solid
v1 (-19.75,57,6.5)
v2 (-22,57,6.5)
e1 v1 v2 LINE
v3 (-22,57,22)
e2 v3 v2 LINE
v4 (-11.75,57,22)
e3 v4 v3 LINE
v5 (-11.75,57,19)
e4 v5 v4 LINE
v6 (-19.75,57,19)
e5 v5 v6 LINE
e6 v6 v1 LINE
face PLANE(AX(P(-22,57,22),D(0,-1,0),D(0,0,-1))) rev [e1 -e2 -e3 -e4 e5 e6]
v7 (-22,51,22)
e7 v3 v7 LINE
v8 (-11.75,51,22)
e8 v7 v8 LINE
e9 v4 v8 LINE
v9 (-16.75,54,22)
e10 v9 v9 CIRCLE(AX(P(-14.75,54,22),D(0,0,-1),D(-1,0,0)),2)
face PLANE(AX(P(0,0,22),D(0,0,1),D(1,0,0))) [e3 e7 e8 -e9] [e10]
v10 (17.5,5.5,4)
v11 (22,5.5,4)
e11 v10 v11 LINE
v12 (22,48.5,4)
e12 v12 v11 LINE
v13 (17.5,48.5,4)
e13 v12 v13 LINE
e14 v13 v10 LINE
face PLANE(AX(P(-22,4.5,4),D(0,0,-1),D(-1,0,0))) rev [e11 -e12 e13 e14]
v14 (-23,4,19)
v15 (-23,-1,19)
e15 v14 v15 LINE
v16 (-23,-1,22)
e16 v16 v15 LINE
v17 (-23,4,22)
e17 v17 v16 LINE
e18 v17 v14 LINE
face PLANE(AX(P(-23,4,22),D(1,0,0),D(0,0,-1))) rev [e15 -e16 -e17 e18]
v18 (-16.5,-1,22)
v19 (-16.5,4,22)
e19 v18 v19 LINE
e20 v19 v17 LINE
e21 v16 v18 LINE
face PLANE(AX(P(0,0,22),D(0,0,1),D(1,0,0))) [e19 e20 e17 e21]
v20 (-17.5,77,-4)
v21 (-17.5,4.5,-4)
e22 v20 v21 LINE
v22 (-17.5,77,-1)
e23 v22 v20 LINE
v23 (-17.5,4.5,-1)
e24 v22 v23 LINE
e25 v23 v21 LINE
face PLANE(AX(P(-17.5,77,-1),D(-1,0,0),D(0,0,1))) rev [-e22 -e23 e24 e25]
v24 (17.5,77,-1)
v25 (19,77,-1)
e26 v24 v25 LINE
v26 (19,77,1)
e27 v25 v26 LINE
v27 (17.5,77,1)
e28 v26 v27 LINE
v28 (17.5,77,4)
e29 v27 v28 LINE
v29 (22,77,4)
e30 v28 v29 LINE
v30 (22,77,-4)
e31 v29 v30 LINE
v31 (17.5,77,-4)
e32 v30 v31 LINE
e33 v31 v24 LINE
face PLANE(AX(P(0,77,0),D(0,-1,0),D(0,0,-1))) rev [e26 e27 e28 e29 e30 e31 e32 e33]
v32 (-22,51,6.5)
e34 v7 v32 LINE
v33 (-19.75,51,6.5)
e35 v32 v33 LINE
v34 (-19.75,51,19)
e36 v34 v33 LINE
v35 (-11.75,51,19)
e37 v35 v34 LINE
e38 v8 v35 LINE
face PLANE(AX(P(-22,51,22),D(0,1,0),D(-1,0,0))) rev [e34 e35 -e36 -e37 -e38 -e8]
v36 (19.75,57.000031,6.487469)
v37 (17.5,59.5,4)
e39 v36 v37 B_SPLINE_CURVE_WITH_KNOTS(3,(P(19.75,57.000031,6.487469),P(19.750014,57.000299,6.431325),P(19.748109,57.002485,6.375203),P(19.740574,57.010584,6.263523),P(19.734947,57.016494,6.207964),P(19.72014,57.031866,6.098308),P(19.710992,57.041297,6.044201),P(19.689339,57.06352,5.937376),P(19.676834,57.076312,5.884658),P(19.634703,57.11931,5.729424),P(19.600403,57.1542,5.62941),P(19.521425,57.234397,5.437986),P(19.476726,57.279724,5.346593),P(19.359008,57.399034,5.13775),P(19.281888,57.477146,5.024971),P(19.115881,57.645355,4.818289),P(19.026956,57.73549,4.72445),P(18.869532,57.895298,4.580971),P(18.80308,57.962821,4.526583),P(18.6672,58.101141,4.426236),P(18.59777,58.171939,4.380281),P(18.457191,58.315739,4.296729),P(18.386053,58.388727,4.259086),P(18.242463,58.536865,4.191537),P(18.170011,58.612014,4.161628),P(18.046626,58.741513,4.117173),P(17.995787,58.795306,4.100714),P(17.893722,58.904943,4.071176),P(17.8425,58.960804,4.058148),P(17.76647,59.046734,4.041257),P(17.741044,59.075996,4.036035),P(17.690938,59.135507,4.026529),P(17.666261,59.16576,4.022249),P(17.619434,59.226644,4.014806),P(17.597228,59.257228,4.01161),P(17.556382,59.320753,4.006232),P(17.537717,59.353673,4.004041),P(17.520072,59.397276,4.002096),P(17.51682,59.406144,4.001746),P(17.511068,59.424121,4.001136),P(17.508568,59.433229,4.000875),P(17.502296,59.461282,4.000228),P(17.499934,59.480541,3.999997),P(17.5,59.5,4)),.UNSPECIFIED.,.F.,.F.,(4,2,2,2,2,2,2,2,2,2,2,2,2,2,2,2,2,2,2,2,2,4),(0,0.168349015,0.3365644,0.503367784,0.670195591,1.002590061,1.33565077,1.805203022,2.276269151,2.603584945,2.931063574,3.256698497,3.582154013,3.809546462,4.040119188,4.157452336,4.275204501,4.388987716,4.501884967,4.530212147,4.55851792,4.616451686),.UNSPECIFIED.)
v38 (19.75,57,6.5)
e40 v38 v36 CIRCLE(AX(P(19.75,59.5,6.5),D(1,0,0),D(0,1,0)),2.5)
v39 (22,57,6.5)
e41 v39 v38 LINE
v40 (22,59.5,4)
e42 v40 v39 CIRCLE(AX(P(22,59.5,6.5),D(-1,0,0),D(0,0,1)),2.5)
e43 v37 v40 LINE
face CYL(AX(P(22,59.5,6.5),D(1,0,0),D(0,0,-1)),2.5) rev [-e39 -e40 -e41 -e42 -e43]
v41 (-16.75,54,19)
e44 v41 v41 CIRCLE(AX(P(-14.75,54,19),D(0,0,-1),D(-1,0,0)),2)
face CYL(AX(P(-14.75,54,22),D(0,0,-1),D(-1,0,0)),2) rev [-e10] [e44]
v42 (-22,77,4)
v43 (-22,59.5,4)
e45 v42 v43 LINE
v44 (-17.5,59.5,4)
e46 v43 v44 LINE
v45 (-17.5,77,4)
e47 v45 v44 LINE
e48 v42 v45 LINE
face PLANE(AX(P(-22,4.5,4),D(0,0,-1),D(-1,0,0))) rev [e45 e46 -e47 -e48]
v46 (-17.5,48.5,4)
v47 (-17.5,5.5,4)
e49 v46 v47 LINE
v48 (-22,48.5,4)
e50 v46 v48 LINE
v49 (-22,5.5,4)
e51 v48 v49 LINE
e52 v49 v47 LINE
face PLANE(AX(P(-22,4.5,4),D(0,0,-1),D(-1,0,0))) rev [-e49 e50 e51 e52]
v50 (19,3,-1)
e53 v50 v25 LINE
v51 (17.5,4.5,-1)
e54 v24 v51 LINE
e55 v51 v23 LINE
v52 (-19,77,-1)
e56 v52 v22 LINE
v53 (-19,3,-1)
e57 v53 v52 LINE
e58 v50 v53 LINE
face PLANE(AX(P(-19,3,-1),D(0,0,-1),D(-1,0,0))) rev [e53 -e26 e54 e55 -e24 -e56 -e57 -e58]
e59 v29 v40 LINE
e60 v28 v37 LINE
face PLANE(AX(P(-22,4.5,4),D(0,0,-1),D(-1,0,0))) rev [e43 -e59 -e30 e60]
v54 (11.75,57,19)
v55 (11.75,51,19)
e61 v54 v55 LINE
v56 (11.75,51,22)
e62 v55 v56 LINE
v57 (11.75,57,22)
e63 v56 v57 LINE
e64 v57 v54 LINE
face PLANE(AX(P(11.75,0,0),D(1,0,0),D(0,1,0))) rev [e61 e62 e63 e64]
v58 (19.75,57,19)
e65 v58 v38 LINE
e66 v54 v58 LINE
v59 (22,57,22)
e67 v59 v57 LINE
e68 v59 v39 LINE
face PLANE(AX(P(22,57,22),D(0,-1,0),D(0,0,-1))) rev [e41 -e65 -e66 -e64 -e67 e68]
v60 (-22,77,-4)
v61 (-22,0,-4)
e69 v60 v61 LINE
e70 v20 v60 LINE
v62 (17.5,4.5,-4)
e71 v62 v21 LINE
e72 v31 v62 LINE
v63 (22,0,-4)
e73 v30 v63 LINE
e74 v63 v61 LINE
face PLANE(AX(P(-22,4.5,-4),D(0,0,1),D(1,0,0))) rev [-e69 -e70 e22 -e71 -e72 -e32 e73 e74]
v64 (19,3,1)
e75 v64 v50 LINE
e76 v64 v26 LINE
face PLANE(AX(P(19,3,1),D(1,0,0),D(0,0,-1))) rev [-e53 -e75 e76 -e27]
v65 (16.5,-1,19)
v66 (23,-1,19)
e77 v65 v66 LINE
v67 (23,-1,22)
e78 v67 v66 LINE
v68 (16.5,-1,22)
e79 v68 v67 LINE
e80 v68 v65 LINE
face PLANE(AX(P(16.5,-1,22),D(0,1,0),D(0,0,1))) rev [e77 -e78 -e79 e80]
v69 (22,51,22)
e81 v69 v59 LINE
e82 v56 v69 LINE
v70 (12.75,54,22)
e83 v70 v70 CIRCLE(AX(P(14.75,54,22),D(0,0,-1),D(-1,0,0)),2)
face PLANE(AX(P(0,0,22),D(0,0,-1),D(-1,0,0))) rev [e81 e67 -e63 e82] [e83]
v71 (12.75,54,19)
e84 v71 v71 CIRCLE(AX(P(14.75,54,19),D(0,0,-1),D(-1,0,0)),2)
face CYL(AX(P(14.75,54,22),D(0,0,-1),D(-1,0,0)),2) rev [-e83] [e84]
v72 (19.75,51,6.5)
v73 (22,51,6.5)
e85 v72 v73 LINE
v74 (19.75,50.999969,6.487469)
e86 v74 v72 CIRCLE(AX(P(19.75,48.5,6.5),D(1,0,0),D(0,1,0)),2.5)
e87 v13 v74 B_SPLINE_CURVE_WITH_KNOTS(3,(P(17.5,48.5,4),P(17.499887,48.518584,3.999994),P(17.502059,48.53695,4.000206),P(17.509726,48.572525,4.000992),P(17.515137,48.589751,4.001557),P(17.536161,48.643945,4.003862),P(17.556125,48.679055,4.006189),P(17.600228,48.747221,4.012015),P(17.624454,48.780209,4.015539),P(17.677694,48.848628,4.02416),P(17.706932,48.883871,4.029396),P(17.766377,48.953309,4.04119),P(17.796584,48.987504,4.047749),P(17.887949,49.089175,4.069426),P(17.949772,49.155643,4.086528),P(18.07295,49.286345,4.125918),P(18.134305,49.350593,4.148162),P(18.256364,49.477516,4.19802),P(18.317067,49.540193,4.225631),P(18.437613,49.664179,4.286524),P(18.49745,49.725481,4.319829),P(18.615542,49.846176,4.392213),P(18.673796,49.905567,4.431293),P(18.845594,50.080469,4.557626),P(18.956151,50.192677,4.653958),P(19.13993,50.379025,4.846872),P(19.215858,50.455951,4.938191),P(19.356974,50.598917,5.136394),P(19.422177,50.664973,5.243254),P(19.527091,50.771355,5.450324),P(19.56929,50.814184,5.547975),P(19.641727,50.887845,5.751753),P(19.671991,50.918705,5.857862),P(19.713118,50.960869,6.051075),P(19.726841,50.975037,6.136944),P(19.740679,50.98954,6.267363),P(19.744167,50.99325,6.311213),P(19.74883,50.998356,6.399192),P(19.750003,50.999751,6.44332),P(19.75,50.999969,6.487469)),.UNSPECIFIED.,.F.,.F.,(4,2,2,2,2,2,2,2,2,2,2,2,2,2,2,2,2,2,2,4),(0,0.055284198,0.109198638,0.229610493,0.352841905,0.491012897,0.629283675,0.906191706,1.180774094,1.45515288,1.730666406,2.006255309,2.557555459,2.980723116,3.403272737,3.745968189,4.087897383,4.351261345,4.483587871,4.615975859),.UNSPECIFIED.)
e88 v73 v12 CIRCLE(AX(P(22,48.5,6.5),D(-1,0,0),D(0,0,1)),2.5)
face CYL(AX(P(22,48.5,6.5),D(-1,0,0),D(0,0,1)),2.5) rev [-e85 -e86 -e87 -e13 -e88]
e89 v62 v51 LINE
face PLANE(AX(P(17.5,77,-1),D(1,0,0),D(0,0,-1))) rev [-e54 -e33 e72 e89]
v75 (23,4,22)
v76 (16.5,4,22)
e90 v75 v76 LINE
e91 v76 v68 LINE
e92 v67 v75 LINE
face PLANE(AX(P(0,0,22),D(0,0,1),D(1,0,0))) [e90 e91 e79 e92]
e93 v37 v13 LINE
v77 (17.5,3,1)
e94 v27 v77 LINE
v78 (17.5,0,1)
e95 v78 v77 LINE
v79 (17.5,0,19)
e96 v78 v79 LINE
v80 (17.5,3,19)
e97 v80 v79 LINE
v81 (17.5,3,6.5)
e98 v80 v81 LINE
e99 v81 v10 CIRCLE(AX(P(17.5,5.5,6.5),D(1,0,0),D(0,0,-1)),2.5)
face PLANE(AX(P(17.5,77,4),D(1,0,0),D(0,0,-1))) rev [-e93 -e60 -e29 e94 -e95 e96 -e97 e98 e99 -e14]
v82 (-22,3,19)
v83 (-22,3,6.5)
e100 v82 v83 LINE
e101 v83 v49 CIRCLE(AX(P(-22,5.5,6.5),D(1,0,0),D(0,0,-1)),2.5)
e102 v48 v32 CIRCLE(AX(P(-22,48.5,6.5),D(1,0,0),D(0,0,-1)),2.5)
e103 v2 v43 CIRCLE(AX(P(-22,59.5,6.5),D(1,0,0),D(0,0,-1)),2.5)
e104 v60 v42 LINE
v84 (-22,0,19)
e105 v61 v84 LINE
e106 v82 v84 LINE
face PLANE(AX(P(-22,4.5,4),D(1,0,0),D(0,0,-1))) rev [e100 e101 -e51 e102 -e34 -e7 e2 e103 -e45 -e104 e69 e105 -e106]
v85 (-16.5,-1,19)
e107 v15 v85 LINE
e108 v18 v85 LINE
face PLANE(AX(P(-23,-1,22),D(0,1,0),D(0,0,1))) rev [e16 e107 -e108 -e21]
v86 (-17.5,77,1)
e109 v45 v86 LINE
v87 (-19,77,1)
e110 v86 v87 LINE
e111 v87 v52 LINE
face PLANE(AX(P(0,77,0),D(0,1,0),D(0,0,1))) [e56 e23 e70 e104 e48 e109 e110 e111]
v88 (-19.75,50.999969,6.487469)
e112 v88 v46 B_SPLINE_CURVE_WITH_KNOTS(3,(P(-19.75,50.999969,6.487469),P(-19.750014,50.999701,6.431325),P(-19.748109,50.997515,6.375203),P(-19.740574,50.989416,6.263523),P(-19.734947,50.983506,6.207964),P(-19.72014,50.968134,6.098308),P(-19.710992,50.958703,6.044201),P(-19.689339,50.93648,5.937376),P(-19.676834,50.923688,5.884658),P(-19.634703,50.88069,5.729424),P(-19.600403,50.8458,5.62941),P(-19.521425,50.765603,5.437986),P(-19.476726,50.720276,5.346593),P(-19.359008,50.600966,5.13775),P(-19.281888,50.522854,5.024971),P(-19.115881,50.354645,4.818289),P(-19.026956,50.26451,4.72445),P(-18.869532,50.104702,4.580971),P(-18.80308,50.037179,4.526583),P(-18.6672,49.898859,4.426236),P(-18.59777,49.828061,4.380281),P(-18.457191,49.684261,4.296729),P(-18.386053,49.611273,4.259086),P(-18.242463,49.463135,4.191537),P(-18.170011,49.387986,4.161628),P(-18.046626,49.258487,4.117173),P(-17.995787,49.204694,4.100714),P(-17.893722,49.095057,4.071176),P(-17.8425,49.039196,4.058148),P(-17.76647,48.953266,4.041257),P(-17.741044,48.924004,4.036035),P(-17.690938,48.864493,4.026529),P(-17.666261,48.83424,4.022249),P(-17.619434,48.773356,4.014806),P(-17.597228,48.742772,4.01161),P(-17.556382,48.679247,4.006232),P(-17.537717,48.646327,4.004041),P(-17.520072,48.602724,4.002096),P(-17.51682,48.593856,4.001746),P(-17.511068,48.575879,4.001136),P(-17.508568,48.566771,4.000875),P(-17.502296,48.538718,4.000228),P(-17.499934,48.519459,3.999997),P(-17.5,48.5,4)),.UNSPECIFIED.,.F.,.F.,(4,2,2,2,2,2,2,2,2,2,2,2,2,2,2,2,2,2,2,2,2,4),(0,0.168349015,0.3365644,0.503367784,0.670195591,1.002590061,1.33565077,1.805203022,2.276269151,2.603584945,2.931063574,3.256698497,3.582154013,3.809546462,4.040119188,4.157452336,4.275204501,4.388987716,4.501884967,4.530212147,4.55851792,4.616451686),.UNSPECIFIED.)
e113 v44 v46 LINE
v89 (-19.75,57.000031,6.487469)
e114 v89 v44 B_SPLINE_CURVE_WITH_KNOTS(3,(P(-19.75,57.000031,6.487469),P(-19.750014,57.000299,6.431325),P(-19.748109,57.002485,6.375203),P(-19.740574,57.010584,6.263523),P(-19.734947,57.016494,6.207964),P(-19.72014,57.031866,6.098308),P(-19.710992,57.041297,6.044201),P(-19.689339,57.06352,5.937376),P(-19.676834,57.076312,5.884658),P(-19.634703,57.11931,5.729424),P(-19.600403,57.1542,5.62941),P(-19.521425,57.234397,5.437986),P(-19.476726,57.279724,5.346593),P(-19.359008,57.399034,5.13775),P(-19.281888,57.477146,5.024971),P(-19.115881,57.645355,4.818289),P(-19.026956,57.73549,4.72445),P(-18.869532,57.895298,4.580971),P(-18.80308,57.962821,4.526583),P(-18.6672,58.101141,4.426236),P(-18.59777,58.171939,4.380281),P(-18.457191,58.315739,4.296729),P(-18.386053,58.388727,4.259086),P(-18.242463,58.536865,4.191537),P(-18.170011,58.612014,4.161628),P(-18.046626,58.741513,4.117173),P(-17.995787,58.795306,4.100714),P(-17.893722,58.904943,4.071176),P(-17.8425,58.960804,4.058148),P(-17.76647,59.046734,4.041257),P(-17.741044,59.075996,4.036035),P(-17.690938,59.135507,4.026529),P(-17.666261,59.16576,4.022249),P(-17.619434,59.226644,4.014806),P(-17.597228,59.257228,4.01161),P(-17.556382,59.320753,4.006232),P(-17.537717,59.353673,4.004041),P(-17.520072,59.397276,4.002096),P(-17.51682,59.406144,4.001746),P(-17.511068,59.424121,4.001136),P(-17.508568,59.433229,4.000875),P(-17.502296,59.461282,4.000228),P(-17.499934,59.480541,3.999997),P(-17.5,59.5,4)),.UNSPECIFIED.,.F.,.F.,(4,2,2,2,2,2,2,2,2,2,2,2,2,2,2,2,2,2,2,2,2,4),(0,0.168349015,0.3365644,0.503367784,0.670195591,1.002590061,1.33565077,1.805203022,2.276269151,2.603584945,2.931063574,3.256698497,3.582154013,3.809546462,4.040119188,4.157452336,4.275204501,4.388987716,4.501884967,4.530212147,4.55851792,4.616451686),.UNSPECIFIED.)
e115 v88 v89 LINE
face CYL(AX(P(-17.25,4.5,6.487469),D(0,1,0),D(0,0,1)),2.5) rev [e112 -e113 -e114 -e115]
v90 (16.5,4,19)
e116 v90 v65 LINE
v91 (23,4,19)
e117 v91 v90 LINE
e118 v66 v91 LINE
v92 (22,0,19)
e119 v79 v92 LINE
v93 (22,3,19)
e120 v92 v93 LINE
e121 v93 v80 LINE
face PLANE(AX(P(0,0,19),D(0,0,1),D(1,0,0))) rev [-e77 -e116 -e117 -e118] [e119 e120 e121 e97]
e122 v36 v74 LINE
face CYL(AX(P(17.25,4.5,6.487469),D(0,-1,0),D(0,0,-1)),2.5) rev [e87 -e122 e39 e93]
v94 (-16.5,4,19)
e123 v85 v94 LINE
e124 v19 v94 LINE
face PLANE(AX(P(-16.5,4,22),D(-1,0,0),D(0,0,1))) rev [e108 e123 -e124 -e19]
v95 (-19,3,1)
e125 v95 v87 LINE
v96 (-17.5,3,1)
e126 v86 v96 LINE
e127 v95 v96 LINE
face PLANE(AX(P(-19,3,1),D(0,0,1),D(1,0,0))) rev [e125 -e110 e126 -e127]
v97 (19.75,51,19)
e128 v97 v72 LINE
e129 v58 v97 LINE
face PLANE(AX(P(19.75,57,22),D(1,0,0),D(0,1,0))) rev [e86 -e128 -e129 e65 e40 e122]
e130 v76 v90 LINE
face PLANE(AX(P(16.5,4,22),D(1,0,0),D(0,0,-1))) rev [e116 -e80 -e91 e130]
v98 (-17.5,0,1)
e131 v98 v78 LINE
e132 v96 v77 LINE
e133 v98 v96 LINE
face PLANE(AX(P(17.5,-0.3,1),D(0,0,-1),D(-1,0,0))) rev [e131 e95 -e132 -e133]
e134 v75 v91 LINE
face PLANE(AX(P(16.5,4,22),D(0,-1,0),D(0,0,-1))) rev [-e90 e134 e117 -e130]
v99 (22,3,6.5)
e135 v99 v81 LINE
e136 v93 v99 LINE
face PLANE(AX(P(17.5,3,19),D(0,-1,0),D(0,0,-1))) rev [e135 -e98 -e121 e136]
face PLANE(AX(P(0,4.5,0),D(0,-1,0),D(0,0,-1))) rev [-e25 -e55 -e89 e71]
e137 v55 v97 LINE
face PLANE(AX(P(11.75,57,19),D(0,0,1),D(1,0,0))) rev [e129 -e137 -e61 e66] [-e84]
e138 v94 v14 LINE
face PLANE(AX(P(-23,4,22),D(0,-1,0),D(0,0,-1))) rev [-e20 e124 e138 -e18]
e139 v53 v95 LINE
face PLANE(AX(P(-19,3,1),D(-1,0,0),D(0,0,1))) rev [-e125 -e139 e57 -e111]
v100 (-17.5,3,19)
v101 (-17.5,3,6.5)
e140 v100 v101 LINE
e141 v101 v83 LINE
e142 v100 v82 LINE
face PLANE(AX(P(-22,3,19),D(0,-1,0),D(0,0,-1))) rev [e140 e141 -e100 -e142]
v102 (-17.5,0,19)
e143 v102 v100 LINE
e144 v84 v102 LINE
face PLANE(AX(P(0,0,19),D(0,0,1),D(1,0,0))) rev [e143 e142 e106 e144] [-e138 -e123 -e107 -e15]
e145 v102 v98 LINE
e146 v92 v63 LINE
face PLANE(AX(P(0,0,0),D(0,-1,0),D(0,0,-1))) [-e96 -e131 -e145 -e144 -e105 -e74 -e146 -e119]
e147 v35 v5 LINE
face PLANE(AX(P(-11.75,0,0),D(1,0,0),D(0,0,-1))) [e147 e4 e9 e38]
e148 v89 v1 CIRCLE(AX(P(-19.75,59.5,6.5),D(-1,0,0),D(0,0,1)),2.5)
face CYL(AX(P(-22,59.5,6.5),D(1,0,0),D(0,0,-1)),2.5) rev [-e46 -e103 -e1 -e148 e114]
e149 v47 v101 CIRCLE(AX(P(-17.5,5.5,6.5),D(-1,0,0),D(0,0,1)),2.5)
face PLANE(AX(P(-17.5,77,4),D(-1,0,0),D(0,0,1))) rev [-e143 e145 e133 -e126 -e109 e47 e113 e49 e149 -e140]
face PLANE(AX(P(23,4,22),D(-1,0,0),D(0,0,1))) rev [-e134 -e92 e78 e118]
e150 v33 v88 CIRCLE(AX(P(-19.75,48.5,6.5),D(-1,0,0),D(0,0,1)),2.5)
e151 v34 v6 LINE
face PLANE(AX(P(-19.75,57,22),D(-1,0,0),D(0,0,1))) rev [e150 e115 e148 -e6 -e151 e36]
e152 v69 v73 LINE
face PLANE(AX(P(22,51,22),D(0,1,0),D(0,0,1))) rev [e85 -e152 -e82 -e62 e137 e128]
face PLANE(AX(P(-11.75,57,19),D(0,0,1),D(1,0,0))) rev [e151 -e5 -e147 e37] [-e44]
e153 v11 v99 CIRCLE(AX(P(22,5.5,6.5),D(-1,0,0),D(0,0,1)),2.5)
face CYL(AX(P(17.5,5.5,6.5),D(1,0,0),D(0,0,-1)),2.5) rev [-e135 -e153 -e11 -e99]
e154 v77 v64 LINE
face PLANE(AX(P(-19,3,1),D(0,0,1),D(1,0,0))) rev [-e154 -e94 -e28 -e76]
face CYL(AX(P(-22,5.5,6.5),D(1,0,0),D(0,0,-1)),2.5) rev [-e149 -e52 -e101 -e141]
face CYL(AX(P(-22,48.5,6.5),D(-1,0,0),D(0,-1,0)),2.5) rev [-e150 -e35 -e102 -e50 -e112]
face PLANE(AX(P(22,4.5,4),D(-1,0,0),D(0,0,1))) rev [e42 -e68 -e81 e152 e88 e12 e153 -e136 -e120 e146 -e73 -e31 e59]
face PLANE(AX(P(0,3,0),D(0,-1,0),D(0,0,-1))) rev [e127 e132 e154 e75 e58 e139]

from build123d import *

# Parameters (mm, degrees)
SKETCH2_W           = 44
SKETCH2_H           = 8
BOSS_EXTRUDE2_DEPTH = 4.5
SKETCH3_W           = 38
SKETCH3_H           = 2
CUT_EXTRUDE1_DEPTH  = 1.5
BOSS_EXTRUDE3_DEPTH = 72.5
SKETCH5_W           = 35
SKETCH5_H           = 3
CUT_EXTRUDE2_DEPTH  = 4.8
SKETCH6_W           = 2.25
SKETCH6_H           = 6
BOSS_EXTRUDE5_DEPTH = 18
SKETCH7_W           = 3
SKETCH7_H           = 6
BOSS_EXTRUDE6_DEPTH = 8
SKETCH8_W           = 3
SKETCH8_H           = 6
BOSS_EXTRUDE7_DEPTH = 8
SKETCH9_R           = 2
CUT_EXTRUDE3_DEPTH  = 3
SKETCH10_W          = 4.5
SKETCH10_H          = 3
BOSS_EXTRUDE8_DEPTH = 15
SKETCH11_W          = 6.5
SKETCH11_H          = 5
BOSS_EXTRUDE9_DEPTH = 3
FILLET1_R           = 2.5
FILLET2_START       = 51
FILLET2_DEPTH       = 8.5
FILLET2_START_2     = -19.75
FILLET2_2_DEPTH     = 2.25
FILLET3_START       = -22
FILLET3_DEPTH       = 4.500001455
FILLET3_START_2     = 47
FILLET3_2_DEPTH     = 4
FILLET4_R           = 2.5
FILLET5_R           = 2.5
FILLET6_R           = 2.5
FILLET7_R           = 2.5
FILLET8_R           = 2.5


with BuildPart() as part:
    # Sketch2 → Boss-Extrude2 (new body)
    with BuildSketch(Plane(origin=(0, 0, 0), x_dir=(1, 0, 0), z_dir=(0, 1, 0))):
        Rectangle(SKETCH2_W, SKETCH2_H)
    extrude(amount=BOSS_EXTRUDE2_DEPTH)

    # Sketch3 → Cut-Extrude1 (cut)
    with BuildSketch(Plane(origin=(0, 4.5, 0), x_dir=(1, 0, 0), z_dir=(0, 1, 0))):
        Rectangle(SKETCH3_W, SKETCH3_H)
    extrude(amount=-CUT_EXTRUDE1_DEPTH, mode=Mode.SUBTRACT)

    # Sketch4 → Boss-Extrude3 (add)
    with BuildSketch(Plane(origin=(0, 4.5, 0), x_dir=(1, 0, 0), z_dir=(0, 1, 0))):
        Polygon((-17.5, 1), (-17.5, 4), (-22, 4), (-22, -4), (-17.5, -4), (-17.5, -1), (-19, -1), (-19, 1), align=None)
        Polygon((17.5, 1), (17.5, 4), (22, 4), (22, -4), (17.5, -4), (17.5, -1), (19, -1), (19, 1), align=None)
    extrude(amount=BOSS_EXTRUDE3_DEPTH)

    # Sketch5 → Cut-Extrude2 (cut)
    with BuildSketch(Plane(origin=(0, 4.5, 0), x_dir=(1, 0, 0), z_dir=(0, 1, 0))):
        with Locations((0, -2.5)):
            Rectangle(SKETCH5_W, SKETCH5_H)
    extrude(amount=-CUT_EXTRUDE2_DEPTH, mode=Mode.SUBTRACT)

    # Sketch6 → Boss-Extrude5 (add)
    with BuildSketch(Plane.XY.offset(4)):
        with Locations((-20.875, 54)):
            Rectangle(SKETCH6_W, SKETCH6_H)
        with Locations((20.875, 54)):
            Rectangle(SKETCH6_W, SKETCH6_H)
    extrude(amount=BOSS_EXTRUDE5_DEPTH)

    # Sketch7 → Boss-Extrude6 (add)
    with BuildSketch(Plane.ZY.offset(-19.75)):
        with Locations((20.5, 54)):
            Rectangle(SKETCH7_W, SKETCH7_H)
    extrude(amount=BOSS_EXTRUDE6_DEPTH)

    # Sketch8 → Boss-Extrude7 (add)
    with BuildSketch(Plane(origin=(-19.75, 0, 0), x_dir=(0, 0, -1), z_dir=(1, 0, 0))):
        with Locations((-20.5, 54)):
            Rectangle(SKETCH8_W, SKETCH8_H)
    extrude(amount=BOSS_EXTRUDE7_DEPTH)

    # Sketch9 → Cut-Extrude3 (cut)
    with BuildSketch(Plane(origin=(0, 0, 19), x_dir=(-1, 0, 0), z_dir=(0, 0, -1))):
        with Locations((14.75, 54)):
            Circle(SKETCH9_R)
        with Locations((-14.75, 54)):
            Circle(SKETCH9_R)
    extrude(amount=-CUT_EXTRUDE3_DEPTH, mode=Mode.SUBTRACT)

    # Sketch10 → Boss-Extrude8 (add)
    with BuildSketch(Plane.XY.offset(4)):
        with Locations((19.75, 1.5)):
            Rectangle(SKETCH10_W, SKETCH10_H)
        with Locations((-19.75, 1.5)):
            Rectangle(SKETCH10_W, SKETCH10_H)
    extrude(amount=BOSS_EXTRUDE8_DEPTH)

    # Sketch11 → Boss-Extrude9 (add)
    with BuildSketch(Plane.XY.offset(19)):
        with Locations((-19.75, 1.5)):
            Rectangle(SKETCH11_W, SKETCH11_H)
        with Locations((19.75, 1.5)):
            Rectangle(SKETCH11_W, SKETCH11_H)
    extrude(amount=BOSS_EXTRUDE9_DEPTH)

    # Fillet1
    fillet1_edges = [part.edges().sort_by_distance(p)[0] for p in [
        (-20.875, 57, 4),
    ]]
    fillet(fillet1_edges, radius=FILLET1_R)

    # Fillet2: read off the stored shape, not the designer's step
    # Fillet2 outline → Fillet2 (add)
    with BuildSketch(Plane(origin=(0, 0, 0), x_dir=(1, 0, 0), z_dir=(0, 1, 0)).offset(FILLET2_START)):
        with BuildLine():
            ThreePointArc((-19.75, -6.487468593), (-19.104023888, -4.81038916), (-17.49992366, -3.999992329))
            Line((-17.49992366, -3.999992329), (-19.75, -4))
            Line((-19.75, -4), (-19.75, -6.487468593))
        make_face()
    extrude(amount=FILLET2_DEPTH)

    # Fillet2 2 outline → Fillet2 2 (cut)
    with BuildSketch(Plane.YZ.offset(FILLET2_START_2)):
        with BuildLine():
            Line((57, 8), (57, 6.5))
            ThreePointArc((57, 6.5), (57.732233047, 4.732233047), (59.5, 4))
            Line((59.5, 4), (59.5, 8))
            Line((59.5, 8), (57, 8))
        make_face()
    extrude(amount=FILLET2_2_DEPTH, mode=Mode.SUBTRACT)

    # Fillet3: read off the stored shape, not the designer's step
    # Fillet3 outline → Fillet3 (add)
    with BuildSketch(Plane.YZ.offset(FILLET3_START)):
        with BuildLine():
            Line((51, 4), (51, 6.5))
            ThreePointArc((51, 6.5), (50.267766953, 4.732233047), (48.5, 4))
            Line((48.5, 4), (51, 4))
        make_face()
    extrude(amount=FILLET3_DEPTH)

    # Fillet3 2 outline → Fillet3 2 (cut)
    with BuildSketch(Plane(origin=(0, 0, 0), x_dir=(1, 0, 0), z_dir=(0, 1, 0)).offset(FILLET3_START_2)):
        with BuildLine():
            Line((-17.499998545, -8), (-17.49992366, -3.999992329))
            ThreePointArc((-17.49992366, -3.999992329), (-19.104023888, -4.81038916), (-19.75, -6.487468593))
            Line((-19.75, -6.487468593), (-19.749999999, -8))
            Line((-19.749999999, -8), (-17.499998545, -8))
        make_face()
    extrude(amount=FILLET3_2_DEPTH, mode=Mode.SUBTRACT)

    # Fillet4
    # the kernel refuses this fillet: 2.5 mm, written as the material it adds along each edge
    with BuildSketch(Plane(origin=(19.75, 57, 4), x_dir=(0, 0, 1), z_dir=(0, -1, 0))) as fillet4_piece_1:
        with BuildLine():
            CenterArc((2.487468593, 2.5), FILLET4_R, 185.739170477, 84.260829523)
            Line((0, 2.25), (-0.049749372, 2.245))
            ThreePointArc((-0.049749372, 2.245), (-0.05, 1.125), (-0.05, 0))
            Line((-0.05, 0), (0, -0.05))
            Line((0, -0.05), (2.487468593, -0.05))
            Line((2.487468593, -0.05), (2.487468593, 0))
        make_face()
    extrude(amount=6)

    # Fillet5
    # the kernel refuses this fillet: 2.5 mm, written as the material it adds along each edge
    with BuildSketch(Plane(origin=(22, 57, 4), x_dir=(0, 1, 0), z_dir=(-1, 0, 0))) as fillet5_piece_1_section:
        with BuildLine():
            CenterArc((FILLET5_R, -FILLET5_R), FILLET5_R, 90, 90)
            Line((0, -FILLET5_R), (0, 0))
            Line((0, 0), (FILLET5_R, 0))
        make_face()
    fillet5_piece_1 = extrude(amount=4.5, mode=Mode.PRIVATE)
    fillet5_piece_1 = fillet5_piece_1 - Plane(origin=(17.25, 57, 6.487468593), x_dir=(0, 0, 1), z_dir=(0, 1, 0)) * Cylinder(2.5, 19, mode=Mode.PRIVATE)
    add(fillet5_piece_1)

    # Fillet6
    # the kernel refuses this fillet: 2.5 mm, written as the material it adds along each edge
    with BuildSketch(Plane(origin=(17.5, 51, 4), x_dir=(0, -1, 0), z_dir=(1, 0, 0))) as fillet6_piece_1_section:
        with BuildLine():
            CenterArc((FILLET6_R, -FILLET6_R), FILLET6_R, 90, 90)
            Line((0, -FILLET6_R), (0, 0))
            Line((0, 0), (FILLET6_R, 0))
        make_face()
    fillet6_piece_1 = extrude(amount=4.5, mode=Mode.PRIVATE)
    fillet6_piece_1 = fillet6_piece_1 - Plane(origin=(17.25, 51, 6.487468593), x_dir=(0, 0, 1), z_dir=(0, 1, 0)) * Cylinder(2.5, 19, mode=Mode.PRIVATE)
    add(fillet6_piece_1)

    # Fillet7
    fillet7_edges = [part.edges().sort_by_distance(p)[0] for p in [
        (-19.75, 3, 4),
    ]]
    fillet(fillet7_edges, radius=FILLET7_R)

    # Fillet8
    fillet8_edges = [part.edges().sort_by_distance(p)[0] for p in [
        (19.75, 3, 4),
    ]]
    fillet(fillet8_edges, radius=FILLET8_R)


solid = part.part
